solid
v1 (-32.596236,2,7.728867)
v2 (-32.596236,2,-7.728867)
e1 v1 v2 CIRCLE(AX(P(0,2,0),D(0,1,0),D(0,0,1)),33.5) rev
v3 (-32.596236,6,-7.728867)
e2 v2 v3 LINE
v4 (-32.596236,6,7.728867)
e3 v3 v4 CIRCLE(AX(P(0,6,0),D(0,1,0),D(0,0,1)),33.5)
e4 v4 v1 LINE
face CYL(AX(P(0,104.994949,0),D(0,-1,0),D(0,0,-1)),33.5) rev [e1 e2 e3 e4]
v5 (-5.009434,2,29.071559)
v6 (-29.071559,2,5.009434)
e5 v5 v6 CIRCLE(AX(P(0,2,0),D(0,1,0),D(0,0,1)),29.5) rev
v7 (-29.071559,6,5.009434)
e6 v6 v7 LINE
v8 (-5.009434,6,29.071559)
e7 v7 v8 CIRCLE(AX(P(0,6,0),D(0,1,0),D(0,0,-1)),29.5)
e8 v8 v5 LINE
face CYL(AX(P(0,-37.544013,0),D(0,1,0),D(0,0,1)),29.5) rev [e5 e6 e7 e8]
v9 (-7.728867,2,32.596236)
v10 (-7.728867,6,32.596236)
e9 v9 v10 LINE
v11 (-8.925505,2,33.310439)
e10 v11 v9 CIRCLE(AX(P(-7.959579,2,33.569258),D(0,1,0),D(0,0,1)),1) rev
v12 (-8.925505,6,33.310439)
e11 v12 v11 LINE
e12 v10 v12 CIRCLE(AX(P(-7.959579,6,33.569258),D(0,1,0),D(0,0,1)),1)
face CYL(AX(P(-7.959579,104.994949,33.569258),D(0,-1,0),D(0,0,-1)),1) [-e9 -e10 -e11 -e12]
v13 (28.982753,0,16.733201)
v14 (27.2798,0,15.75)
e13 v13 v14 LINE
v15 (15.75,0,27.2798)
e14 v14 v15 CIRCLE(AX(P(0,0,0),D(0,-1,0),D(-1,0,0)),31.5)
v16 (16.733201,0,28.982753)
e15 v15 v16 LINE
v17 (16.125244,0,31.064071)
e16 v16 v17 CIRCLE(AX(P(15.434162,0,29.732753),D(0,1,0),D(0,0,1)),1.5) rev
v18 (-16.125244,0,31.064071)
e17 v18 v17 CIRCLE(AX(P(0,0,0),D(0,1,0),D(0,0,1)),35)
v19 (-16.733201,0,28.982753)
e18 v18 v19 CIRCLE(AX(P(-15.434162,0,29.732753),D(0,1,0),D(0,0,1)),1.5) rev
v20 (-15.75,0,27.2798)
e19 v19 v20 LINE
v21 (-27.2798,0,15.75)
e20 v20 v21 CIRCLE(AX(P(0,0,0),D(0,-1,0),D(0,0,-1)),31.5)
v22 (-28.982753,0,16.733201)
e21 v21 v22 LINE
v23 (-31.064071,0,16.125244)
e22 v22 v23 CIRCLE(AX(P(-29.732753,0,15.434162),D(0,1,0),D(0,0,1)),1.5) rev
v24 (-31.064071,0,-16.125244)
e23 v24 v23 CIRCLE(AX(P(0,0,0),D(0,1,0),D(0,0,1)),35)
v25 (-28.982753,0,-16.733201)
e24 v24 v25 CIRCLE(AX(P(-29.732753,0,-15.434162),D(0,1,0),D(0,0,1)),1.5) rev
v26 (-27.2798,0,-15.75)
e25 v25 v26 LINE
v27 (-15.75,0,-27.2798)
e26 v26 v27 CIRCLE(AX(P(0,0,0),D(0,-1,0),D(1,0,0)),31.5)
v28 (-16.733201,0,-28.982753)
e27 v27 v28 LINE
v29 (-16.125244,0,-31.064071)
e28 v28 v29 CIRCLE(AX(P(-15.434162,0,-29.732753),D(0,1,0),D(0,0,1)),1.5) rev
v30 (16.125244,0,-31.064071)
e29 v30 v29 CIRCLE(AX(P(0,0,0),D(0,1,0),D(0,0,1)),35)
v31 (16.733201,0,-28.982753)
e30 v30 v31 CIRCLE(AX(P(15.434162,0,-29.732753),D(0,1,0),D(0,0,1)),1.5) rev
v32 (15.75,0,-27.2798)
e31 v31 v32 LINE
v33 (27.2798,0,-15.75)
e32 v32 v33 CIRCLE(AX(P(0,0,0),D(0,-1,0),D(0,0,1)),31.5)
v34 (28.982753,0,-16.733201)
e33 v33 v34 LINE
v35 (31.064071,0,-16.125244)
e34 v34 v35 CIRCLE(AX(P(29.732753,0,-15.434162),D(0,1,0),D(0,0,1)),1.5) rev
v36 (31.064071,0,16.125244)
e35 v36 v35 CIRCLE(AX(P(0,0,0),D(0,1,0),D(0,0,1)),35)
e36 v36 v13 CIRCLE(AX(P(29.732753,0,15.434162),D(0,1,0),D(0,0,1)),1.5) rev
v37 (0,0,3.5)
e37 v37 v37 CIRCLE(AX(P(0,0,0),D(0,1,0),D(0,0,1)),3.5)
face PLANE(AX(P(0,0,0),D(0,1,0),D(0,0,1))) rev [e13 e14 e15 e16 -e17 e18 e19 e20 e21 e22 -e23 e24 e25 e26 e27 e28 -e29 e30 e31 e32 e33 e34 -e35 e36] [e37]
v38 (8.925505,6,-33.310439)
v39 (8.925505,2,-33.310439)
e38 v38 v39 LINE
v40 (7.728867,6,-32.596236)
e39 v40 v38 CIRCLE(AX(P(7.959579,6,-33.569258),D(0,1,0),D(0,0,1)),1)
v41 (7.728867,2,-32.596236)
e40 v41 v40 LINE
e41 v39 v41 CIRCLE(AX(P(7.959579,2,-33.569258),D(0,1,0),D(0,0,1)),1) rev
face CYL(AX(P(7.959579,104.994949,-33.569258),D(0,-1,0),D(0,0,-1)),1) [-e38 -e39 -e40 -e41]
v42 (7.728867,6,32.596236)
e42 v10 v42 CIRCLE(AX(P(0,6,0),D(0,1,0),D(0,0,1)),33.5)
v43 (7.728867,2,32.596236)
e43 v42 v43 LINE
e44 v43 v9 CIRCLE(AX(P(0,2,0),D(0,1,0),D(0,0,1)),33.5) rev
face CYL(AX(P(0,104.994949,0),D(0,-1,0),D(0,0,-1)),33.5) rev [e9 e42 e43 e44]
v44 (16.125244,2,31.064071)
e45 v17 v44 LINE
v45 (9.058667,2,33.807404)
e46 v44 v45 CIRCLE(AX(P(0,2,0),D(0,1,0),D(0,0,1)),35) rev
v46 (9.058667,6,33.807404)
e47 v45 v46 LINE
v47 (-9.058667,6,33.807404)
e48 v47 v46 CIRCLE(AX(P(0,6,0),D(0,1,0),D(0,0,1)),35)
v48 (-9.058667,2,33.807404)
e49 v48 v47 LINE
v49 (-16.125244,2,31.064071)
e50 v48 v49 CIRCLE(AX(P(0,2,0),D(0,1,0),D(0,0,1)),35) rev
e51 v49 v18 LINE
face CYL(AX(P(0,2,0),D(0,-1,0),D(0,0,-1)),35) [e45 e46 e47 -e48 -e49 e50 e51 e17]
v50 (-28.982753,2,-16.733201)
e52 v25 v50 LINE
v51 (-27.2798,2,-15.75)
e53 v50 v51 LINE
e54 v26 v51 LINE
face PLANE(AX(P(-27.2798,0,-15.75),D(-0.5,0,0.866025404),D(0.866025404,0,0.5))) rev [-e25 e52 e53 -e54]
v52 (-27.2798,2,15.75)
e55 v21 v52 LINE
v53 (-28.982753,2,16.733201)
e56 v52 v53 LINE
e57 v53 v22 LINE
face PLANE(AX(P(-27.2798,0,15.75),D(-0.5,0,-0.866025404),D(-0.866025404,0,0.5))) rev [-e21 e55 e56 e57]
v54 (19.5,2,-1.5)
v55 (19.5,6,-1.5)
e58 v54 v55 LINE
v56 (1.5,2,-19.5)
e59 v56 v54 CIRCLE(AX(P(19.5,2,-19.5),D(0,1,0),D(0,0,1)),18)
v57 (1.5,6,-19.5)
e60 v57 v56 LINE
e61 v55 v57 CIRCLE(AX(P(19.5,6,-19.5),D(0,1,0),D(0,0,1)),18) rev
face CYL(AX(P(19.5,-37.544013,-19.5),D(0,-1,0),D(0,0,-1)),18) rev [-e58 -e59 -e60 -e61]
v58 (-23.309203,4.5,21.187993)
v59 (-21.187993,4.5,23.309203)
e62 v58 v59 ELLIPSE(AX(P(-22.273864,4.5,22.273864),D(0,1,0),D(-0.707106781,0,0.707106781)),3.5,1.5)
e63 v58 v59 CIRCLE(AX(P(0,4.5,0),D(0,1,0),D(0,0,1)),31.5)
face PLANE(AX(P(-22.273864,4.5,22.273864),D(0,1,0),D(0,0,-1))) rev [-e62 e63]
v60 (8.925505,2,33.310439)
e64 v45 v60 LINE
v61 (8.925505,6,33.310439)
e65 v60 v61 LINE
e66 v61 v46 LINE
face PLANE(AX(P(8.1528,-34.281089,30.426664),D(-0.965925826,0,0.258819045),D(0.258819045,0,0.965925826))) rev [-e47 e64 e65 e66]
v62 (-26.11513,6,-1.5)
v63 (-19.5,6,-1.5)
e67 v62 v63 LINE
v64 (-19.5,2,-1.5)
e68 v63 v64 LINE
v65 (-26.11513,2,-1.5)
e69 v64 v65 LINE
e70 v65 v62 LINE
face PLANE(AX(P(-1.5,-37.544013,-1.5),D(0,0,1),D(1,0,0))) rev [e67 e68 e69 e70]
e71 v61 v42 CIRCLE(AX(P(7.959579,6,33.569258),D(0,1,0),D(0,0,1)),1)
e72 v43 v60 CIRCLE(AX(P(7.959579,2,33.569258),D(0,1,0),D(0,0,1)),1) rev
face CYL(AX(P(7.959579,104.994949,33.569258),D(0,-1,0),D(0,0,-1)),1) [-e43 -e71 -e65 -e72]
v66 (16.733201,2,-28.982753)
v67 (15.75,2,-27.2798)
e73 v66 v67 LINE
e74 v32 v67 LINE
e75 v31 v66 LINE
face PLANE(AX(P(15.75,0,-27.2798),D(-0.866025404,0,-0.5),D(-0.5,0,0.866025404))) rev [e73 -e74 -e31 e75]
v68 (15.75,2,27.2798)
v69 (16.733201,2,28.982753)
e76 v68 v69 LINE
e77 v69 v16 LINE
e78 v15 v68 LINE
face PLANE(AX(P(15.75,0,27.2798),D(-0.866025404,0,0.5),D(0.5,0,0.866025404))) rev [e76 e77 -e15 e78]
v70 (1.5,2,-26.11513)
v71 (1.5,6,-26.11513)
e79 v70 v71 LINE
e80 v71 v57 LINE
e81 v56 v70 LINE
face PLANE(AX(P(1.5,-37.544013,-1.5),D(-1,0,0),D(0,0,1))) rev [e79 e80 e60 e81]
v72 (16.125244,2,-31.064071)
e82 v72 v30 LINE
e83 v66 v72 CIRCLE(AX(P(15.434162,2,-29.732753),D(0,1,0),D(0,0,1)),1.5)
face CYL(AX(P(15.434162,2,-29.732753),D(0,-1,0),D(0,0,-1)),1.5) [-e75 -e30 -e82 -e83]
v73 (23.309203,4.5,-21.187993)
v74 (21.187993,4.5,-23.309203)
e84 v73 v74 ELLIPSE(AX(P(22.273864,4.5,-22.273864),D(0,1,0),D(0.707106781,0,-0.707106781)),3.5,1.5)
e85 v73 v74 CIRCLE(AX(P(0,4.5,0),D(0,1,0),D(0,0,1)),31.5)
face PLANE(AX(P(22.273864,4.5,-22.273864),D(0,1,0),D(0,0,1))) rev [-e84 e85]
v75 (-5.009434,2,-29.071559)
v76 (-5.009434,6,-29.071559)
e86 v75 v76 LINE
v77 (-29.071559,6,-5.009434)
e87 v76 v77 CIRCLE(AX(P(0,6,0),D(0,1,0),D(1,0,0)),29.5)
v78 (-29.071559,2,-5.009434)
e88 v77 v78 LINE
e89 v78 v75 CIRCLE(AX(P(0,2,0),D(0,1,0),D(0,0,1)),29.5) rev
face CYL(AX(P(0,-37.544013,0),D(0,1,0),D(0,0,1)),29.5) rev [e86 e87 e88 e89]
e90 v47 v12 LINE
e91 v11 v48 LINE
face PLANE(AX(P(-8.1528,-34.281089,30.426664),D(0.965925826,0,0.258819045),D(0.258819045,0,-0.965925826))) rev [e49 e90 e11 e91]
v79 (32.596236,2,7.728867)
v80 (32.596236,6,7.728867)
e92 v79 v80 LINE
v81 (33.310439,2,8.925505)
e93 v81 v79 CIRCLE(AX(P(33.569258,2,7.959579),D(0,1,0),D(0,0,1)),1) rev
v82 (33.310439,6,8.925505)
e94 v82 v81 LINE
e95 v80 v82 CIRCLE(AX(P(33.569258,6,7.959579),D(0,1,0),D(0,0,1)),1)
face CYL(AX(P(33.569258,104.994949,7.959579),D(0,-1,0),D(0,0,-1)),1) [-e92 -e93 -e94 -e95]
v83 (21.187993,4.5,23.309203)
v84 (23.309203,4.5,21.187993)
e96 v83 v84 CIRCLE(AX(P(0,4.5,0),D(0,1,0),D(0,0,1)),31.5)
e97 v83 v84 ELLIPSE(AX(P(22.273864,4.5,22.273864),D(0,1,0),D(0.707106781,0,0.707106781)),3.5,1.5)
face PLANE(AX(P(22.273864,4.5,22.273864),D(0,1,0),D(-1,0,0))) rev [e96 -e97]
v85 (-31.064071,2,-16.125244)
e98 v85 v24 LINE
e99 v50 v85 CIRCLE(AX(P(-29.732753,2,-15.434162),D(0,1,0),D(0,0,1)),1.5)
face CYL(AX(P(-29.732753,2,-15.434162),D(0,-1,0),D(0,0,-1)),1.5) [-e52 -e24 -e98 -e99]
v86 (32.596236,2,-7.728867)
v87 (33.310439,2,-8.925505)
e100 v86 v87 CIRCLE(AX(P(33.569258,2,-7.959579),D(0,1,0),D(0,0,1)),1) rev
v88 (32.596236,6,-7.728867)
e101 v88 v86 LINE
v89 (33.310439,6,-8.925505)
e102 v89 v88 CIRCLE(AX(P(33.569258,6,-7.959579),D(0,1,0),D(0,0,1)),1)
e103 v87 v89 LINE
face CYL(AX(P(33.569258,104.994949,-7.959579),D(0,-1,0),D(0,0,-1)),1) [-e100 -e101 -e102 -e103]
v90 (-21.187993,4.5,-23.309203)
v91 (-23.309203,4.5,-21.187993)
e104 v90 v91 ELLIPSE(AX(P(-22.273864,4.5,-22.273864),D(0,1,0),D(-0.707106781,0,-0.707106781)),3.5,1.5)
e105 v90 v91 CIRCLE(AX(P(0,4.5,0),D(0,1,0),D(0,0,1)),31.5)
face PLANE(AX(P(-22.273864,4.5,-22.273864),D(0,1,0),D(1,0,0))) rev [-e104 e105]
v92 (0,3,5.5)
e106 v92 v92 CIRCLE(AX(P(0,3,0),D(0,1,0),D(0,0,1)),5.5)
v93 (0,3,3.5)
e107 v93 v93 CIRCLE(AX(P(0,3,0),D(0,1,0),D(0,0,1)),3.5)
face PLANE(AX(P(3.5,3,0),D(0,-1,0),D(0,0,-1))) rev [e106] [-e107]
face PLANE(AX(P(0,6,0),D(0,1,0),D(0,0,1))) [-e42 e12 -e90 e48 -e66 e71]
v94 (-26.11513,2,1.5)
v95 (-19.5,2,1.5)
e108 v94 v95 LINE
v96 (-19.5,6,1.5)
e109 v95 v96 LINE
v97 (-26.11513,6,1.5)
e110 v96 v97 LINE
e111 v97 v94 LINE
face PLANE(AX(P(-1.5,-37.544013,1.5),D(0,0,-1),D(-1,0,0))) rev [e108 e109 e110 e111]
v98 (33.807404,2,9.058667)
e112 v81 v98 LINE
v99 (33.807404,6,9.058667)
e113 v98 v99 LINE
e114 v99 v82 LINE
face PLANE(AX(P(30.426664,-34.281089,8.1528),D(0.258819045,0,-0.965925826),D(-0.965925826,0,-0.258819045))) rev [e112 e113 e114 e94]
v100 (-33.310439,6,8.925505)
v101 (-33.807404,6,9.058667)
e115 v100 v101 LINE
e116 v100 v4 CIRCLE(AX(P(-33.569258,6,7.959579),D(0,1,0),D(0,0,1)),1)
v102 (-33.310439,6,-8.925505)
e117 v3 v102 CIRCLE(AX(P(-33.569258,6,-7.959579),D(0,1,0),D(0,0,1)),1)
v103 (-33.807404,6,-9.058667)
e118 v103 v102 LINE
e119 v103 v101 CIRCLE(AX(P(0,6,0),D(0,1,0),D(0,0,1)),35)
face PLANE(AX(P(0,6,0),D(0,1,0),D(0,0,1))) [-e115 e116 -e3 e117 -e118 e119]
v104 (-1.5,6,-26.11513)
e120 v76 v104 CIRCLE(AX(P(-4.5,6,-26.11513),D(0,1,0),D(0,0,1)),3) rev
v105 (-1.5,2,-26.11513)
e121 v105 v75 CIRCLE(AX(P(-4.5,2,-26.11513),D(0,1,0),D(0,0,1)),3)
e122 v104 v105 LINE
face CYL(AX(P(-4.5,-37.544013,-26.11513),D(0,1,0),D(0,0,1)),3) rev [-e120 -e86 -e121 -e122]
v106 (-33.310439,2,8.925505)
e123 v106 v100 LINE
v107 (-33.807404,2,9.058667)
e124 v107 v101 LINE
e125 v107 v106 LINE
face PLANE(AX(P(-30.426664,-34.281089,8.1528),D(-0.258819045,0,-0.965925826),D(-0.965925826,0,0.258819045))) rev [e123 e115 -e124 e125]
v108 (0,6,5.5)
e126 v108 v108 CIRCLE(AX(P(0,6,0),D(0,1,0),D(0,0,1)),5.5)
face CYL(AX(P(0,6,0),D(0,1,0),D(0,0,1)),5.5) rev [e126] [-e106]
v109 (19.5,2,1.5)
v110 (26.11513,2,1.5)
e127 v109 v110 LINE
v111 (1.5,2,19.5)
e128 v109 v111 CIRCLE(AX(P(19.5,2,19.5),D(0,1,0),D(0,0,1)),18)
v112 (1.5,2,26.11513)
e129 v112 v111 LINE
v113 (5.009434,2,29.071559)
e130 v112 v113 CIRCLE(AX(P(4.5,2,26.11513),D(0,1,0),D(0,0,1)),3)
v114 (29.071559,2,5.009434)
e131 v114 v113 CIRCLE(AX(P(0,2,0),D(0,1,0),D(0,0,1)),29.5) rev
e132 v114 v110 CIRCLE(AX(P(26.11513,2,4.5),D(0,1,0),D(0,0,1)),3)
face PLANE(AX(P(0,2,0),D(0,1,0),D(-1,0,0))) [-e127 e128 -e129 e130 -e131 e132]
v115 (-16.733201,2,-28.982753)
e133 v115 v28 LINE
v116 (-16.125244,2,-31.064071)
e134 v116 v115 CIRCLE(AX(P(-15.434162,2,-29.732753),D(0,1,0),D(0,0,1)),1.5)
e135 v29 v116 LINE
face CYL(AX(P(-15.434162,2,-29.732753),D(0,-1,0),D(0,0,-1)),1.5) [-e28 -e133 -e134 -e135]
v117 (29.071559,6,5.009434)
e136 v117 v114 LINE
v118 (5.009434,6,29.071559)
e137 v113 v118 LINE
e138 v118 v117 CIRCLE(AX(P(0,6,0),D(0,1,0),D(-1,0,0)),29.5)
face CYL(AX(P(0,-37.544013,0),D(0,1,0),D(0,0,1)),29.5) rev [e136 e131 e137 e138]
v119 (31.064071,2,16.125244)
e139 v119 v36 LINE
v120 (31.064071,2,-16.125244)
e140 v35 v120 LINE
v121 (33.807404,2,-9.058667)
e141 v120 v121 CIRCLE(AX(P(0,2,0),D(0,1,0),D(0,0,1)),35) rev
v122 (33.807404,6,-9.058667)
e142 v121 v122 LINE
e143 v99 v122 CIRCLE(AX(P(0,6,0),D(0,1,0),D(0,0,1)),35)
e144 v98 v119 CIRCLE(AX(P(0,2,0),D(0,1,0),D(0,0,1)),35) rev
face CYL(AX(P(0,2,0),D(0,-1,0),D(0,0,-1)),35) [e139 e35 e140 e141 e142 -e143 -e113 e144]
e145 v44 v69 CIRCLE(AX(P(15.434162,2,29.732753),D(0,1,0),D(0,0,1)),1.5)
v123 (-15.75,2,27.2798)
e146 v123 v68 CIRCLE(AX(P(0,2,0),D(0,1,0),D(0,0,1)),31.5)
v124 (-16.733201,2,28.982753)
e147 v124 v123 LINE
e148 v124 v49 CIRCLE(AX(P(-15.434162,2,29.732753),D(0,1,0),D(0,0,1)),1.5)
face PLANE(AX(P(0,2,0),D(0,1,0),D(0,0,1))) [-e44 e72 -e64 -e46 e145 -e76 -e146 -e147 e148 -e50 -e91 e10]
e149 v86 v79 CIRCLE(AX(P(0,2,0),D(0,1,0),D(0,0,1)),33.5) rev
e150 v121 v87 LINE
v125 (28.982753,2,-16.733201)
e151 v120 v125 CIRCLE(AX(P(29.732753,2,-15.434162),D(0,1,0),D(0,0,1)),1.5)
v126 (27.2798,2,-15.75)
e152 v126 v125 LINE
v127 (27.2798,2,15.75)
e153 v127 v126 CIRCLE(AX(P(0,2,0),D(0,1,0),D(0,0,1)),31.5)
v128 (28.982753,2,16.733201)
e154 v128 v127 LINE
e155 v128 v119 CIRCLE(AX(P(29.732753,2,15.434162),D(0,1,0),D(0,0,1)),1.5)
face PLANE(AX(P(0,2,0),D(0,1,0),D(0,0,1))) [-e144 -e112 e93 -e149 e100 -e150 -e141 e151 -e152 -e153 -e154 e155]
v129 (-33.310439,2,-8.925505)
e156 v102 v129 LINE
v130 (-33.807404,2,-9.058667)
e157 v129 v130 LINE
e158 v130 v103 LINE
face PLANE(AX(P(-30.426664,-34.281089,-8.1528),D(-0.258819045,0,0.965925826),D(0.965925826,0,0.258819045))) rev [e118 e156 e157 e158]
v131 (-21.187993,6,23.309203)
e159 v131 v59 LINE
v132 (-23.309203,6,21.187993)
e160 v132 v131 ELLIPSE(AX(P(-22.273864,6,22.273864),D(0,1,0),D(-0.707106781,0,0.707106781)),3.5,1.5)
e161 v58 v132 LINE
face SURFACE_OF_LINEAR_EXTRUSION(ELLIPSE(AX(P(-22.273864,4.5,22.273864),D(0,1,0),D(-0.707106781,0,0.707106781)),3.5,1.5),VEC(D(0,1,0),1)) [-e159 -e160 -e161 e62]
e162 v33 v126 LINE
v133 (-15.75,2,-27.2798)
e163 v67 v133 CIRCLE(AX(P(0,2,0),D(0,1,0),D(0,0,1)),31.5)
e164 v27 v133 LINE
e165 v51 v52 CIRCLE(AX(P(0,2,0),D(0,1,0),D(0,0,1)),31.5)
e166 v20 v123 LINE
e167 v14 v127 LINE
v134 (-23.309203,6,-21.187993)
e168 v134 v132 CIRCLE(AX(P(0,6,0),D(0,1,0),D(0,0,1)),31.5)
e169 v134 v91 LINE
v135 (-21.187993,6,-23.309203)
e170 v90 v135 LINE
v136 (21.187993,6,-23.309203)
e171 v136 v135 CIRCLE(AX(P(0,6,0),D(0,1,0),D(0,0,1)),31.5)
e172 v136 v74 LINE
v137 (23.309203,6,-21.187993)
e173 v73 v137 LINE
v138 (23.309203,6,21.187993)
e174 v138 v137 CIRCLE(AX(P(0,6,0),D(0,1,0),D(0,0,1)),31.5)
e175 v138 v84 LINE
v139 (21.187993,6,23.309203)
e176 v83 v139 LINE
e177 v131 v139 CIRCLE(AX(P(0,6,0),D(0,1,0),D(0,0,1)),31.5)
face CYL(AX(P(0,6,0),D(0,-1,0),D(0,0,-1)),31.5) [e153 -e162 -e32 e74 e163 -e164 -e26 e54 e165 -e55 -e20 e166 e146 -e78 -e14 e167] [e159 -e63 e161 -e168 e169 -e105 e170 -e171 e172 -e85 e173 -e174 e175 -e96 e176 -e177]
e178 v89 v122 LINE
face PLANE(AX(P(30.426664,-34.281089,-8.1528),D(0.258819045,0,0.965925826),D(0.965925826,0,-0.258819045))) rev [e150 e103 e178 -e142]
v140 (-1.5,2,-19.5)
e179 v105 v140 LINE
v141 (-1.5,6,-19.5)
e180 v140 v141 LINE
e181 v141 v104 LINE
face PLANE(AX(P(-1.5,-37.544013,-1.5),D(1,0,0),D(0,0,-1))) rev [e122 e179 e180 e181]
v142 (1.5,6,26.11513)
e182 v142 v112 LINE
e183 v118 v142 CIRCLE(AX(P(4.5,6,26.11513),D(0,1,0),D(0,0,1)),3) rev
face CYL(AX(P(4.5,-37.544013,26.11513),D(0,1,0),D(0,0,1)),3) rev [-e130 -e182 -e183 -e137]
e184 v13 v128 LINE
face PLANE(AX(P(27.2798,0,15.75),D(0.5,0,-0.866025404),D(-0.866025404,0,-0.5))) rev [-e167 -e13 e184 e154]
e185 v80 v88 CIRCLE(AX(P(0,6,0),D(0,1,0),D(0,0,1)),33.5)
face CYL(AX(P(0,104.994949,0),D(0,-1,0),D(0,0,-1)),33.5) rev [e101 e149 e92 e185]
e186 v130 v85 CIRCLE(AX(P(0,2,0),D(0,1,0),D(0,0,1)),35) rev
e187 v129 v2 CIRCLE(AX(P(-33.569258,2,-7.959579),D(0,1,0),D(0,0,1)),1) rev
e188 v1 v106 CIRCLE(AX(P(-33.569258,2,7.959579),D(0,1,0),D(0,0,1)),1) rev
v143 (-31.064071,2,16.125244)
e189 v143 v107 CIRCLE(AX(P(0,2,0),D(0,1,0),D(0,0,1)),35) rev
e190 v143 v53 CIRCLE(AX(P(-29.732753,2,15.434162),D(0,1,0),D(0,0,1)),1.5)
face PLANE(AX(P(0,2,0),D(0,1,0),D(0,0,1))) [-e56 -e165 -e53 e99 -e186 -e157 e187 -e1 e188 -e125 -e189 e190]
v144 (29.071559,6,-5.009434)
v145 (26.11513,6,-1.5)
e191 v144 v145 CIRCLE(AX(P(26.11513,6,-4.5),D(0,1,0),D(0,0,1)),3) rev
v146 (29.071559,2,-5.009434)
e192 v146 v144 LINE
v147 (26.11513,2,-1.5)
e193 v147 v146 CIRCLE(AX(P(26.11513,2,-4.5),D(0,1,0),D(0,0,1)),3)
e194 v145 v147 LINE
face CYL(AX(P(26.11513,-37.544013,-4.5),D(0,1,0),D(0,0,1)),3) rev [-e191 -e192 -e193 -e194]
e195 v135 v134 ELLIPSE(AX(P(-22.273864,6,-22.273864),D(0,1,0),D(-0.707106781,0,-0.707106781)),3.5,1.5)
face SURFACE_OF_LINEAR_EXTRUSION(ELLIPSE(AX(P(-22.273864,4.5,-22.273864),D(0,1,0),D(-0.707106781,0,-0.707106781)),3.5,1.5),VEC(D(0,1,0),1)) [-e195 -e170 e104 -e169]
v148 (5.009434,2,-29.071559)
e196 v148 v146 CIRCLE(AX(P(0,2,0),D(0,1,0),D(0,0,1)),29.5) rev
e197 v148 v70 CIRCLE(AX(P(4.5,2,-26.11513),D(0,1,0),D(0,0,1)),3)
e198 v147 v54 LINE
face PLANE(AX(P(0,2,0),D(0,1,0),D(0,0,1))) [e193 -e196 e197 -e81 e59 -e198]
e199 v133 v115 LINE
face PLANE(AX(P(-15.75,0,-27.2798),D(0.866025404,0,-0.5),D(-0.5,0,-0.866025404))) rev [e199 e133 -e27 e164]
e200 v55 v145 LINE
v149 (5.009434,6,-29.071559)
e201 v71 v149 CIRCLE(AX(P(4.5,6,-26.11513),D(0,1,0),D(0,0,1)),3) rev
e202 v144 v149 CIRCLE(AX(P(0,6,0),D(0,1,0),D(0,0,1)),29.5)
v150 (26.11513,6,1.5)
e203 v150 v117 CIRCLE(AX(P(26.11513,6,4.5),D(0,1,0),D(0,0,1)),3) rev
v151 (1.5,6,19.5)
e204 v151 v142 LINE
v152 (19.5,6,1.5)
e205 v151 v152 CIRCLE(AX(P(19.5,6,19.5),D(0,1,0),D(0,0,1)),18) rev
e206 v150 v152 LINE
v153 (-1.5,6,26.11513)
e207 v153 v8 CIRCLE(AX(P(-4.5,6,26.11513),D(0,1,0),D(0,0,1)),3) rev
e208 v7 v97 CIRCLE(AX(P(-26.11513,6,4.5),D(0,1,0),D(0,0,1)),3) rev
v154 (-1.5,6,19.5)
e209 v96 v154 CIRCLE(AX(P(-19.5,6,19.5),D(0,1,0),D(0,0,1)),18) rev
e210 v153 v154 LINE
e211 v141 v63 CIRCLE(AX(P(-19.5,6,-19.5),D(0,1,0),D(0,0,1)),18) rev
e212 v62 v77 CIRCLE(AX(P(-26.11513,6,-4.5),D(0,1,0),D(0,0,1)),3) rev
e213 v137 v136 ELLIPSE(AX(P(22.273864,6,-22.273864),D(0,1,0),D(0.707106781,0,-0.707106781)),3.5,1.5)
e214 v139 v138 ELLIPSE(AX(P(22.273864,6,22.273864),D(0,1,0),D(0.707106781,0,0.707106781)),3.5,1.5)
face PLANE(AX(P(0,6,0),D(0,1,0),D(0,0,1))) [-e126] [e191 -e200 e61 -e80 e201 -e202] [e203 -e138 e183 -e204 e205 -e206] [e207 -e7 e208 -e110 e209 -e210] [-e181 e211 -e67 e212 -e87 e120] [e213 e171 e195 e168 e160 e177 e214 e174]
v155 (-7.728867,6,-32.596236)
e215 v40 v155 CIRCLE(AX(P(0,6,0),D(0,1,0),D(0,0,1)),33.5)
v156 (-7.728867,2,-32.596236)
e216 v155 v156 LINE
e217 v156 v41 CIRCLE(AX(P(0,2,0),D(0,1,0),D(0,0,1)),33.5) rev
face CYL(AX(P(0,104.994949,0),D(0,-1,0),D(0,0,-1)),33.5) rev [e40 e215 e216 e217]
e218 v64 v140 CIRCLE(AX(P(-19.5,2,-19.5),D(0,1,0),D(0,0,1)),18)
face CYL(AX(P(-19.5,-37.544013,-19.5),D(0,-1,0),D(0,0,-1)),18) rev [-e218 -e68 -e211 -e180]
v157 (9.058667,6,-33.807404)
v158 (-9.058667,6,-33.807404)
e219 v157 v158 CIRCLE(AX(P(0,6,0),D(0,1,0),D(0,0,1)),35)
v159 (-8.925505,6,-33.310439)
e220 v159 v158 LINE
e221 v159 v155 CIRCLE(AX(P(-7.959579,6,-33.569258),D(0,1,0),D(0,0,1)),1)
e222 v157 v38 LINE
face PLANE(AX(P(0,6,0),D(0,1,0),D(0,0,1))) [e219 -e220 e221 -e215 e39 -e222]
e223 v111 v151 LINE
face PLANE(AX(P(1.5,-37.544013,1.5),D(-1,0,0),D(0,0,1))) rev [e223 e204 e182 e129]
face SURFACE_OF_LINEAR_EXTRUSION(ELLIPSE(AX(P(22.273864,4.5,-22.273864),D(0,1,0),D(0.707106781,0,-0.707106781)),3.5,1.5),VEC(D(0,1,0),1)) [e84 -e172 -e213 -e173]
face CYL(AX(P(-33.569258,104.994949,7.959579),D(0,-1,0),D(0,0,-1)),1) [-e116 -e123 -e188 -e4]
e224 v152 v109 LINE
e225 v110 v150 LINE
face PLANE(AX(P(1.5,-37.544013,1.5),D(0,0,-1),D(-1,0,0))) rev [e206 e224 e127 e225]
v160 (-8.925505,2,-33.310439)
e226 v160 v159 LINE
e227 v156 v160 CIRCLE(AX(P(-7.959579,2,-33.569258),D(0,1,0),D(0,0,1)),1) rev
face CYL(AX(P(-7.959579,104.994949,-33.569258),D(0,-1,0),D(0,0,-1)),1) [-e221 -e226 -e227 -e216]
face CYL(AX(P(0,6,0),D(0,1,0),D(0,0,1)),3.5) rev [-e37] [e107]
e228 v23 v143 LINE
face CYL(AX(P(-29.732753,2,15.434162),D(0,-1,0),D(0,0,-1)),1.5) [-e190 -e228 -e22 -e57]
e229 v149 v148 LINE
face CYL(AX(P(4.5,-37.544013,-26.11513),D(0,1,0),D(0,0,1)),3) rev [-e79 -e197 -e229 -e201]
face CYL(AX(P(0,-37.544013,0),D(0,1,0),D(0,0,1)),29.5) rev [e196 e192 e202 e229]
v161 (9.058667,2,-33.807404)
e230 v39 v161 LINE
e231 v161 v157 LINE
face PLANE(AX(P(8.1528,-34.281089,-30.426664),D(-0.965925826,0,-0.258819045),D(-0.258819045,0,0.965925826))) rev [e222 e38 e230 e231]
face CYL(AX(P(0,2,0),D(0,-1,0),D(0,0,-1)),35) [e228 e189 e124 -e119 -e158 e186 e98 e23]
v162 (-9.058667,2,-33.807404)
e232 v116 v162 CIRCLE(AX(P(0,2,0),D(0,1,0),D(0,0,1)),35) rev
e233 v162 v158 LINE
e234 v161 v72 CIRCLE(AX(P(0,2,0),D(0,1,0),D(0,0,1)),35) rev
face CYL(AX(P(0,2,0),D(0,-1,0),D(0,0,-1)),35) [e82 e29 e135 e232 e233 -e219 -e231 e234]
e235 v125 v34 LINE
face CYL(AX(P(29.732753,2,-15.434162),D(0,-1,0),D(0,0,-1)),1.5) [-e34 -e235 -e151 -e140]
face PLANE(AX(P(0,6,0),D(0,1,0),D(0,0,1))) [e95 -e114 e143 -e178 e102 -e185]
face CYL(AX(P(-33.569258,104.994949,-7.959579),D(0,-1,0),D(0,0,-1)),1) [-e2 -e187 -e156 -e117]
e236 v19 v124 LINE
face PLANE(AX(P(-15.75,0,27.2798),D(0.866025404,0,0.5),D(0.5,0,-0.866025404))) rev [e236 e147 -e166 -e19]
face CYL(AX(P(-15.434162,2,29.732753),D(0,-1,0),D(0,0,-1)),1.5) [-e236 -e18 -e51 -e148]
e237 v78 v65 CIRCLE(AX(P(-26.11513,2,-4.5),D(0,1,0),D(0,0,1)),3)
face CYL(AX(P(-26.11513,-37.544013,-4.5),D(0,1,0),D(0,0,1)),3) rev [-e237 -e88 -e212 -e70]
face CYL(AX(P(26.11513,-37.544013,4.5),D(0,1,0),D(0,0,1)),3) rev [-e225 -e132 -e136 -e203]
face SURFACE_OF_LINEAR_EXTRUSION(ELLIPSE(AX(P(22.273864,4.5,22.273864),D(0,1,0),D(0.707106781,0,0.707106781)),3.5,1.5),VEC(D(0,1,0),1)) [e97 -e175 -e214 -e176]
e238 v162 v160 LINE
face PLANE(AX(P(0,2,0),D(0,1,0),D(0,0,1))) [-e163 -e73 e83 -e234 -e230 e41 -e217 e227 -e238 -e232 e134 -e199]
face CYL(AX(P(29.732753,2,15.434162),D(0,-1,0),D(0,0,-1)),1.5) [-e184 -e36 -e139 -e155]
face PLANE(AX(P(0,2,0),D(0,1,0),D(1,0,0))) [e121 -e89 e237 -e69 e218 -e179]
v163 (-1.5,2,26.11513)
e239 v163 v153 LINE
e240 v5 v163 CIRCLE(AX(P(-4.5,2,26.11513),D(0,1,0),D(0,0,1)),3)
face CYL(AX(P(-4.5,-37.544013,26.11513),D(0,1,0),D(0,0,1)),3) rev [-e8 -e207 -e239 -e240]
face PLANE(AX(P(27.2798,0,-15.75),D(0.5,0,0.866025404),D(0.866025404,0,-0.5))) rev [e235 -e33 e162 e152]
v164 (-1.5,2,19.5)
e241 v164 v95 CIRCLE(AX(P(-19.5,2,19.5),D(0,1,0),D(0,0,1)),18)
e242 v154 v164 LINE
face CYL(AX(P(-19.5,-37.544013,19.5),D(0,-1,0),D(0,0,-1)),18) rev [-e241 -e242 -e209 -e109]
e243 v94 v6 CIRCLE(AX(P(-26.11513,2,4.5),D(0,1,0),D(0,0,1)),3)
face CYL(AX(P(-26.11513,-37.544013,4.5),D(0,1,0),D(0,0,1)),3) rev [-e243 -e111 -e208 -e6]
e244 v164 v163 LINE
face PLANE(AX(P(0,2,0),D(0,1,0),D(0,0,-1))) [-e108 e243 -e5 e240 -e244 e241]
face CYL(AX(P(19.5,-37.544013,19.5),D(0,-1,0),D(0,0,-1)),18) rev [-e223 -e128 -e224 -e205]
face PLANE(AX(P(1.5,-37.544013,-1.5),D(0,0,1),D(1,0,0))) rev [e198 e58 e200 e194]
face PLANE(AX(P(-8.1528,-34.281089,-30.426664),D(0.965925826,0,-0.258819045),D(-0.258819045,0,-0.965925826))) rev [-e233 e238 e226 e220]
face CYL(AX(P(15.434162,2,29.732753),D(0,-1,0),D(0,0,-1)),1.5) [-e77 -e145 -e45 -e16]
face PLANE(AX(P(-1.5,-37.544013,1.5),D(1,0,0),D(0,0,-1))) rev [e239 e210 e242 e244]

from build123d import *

# Parameters (mm, degrees)
SKETCH1_R                                           = 35
BOSS_EXTRUDE1_DEPTH                                 = 2
SKETCH2_R                                           = 31.5
BOSS_EXTRUDE2_DEPTH                                 = 4
SKETCH4_R                                           = 35
SKETCH4_R_2                                         = 33.5
BOSS_EXTRUDE3_DEPTH                                 = 4
CUT_EXTRUDE2_START                                  = -6
CUT_EXTRUDE2_DEPTH                                  = 6
CUT_EXTRUDE3_START                                  = -4
CUT_EXTRUDE3_DEPTH                                  = 4
SKETCH7_RX                                          = 3.5
SKETCH7_RY                                          = 1.5
BOSS_EXTRUDE4_DEPTH                                 = 1.5
CUT_EXTRUDE1_DEPTH                                  = 4
FILLET1_R                                           = 18
FILLET2_R                                           = 3
FILLET3_R                                           = 1.5
FILLET4_R                                           = 1
CIRPATTERN1_COUNT                                   = 4
FILLET1_OF_CIRPATTERN1_R                            = 18
FILLET2_OF_CIRPATTERN1_R                            = 3
FILLET3_OF_CIRPATTERN1_R                            = 1.5
FILLET4_OF_CIRPATTERN1_R                            = 1
CBORE_FOR_M6_HEX_SOCKET_HEAD_CAP_SCREW1_D           = 7
CBORE_FOR_M6_HEX_SOCKET_HEAD_CAP_SCREW1_CBORE_D     = 11
CBORE_FOR_M6_HEX_SOCKET_HEAD_CAP_SCREW1_CBORE_DEPTH = 3


# Read off the part's stored shape, not the designer's step: Cut-Extrude2
with BuildPart() as part:
    # Sketch1 → Boss-Extrude1 (new body)
    with BuildSketch(Plane(origin=(0, 0, 0), x_dir=(1, 0, 0), z_dir=(0, 1, 0))):
        with Locations(Location((0, 0, 0), (0, 0, 270))):
            Circle(SKETCH1_R)
    extrude(amount=BOSS_EXTRUDE1_DEPTH)

    # Sketch2 → Boss-Extrude2 (add)
    with BuildSketch(Plane(origin=(0, 2, 0), x_dir=(1, 0, 0), z_dir=(0, 1, 0))):
        with Locations(Location((0, 0, 0), (0, 0, 270))):
            Circle(SKETCH2_R)
    extrude(amount=BOSS_EXTRUDE2_DEPTH)

    # Sketch4 → Boss-Extrude3 (add)
    with BuildSketch(Plane(origin=(0, 2, 0), x_dir=(1, 0, 0), z_dir=(0, 1, 0))):
        with Locations(Location((0, 0, 0), (0, 0, 270))):
            Circle(SKETCH4_R)
        with Locations(Location((0, 0, 0), (0, 0, 270))):
            Circle(SKETCH4_R_2, mode=Mode.SUBTRACT)
    extrude(amount=BOSS_EXTRUDE3_DEPTH)

    # Cut-Extrude2 outline → Cut-Extrude2 (cut)
    with BuildSketch(Plane(origin=(0, 6, 0), x_dir=(1, 0, 0), z_dir=(0, 1, 0)).offset(CUT_EXTRUDE2_START)):
        with BuildLine():
            ThreePointArc((30.310889132, 17.5), (24.748737342, 24.748737342), (17.5, 30.310889132))
            Line((17.5, 30.310889132), (15.75, 27.279800219))
            ThreePointArc((15.75, 27.279800219), (22.273863607, 22.273863607), (27.279800219, 15.75))
            Line((27.279800219, 15.75), (30.310889132, 17.5))
        make_face()
    cut_extrude2 = extrude(amount=CUT_EXTRUDE2_DEPTH, mode=Mode.SUBTRACT)

    # Sketch6 → Cut-Extrude3 (cut)
    with BuildSketch(Plane(origin=(0, 6, 0), x_dir=(1, 0, 0), z_dir=(0, 1, 0)).offset(CUT_EXTRUDE3_START)):
        with BuildLine():
            Line((8.152799921, 30.426663528), (9.058666579, 33.80740392))
            ThreePointArc((9.058666579, 33.80740392), (24.748737342, 24.748737342), (33.80740392, 9.058666579))
            Line((33.80740392, 9.058666579), (30.426663528, 8.152799921))
            ThreePointArc((30.426663528, 8.152799921), (22.273863607, 22.273863607), (8.152799921, 30.426663528))
        make_face()
    cut_extrude3 = extrude(amount=CUT_EXTRUDE3_DEPTH, mode=Mode.SUBTRACT)

    # Sketch7 → Boss-Extrude4 (add)
    with BuildSketch(Plane(origin=(0, 6, 0), x_dir=(1, 0, 0), z_dir=(0, 1, 0))):
        with Locations(Location((22.273863607, 22.273863607), (0, 0, 45))):
            Ellipse(SKETCH7_RX, SKETCH7_RY)
    boss_extrude4 = extrude(amount=-BOSS_EXTRUDE4_DEPTH)

    # Sketch3 → Cut-Extrude1 (cut)
    with BuildSketch(Plane(origin=(0, 6, 0), x_dir=(1, 0, 0), z_dir=(0, 1, 0))):
        with BuildLine():
            Line((1.5, 1.5), (1.5, 29.461839725))
            ThreePointArc((1.5, 29.461839725), (20.859650045, 20.859650045), (29.461839725, 1.5))
            Line((29.461839725, 1.5), (1.5, 1.5))
        make_face()
    cut_extrude1 = extrude(amount=-CUT_EXTRUDE1_DEPTH, mode=Mode.SUBTRACT)

    # Fillet1
    fillet1_edges = [part.edges().sort_by_distance(p)[0] for p in [
        (1.5, 4, -1.5),
    ]]
    fillet(fillet1_edges, radius=FILLET1_R)

    # Fillet2
    fillet2_edges = [part.edges().sort_by_distance(p)[0] for p in [
        (29.461839725, 4, -1.5),
        (1.5, 4, -29.461839725),
    ]]
    fillet(fillet2_edges, radius=FILLET2_R)

    # Fillet3
    fillet3_edges = [part.edges().sort_by_distance(p)[0] for p in [
        (17.5, 1, -30.310889132),
        (30.310889132, 1, -17.5),
    ]]
    fillet(fillet3_edges, radius=FILLET3_R)

    # Fillet4
    fillet4_edges = [part.edges().sort_by_distance(p)[0] for p in [
        (8.670438011, 4, -32.358515181),
        (32.358515181, 4, -8.670438011),
    ]]
    fillet(fillet4_edges, radius=FILLET4_R)

    # CirPattern1: Cut-Extrude2, Cut-Extrude3, Boss-Extrude4, Cut-Extrude1 ×4 about axis
    cirpattern1_axis = Axis((0, 6, 0), (0, -1, 0))
    add([cut_extrude2.rotate(cirpattern1_axis, i * 360 / CIRPATTERN1_COUNT) for i in range(1, CIRPATTERN1_COUNT)], mode=Mode.SUBTRACT)
    add([cut_extrude3.rotate(cirpattern1_axis, i * 360 / CIRPATTERN1_COUNT) for i in range(1, CIRPATTERN1_COUNT)], mode=Mode.SUBTRACT)
    add([boss_extrude4.rotate(cirpattern1_axis, i * 360 / CIRPATTERN1_COUNT) for i in range(1, CIRPATTERN1_COUNT)])
    add([cut_extrude1.rotate(cirpattern1_axis, i * 360 / CIRPATTERN1_COUNT) for i in range(1, CIRPATTERN1_COUNT)], mode=Mode.SUBTRACT)

    # Fillet1 of CirPattern1
    fillet1_of_cirpattern1_edges = [part.edges().sort_by_distance(p)[0] for p in [
        (1.5, 4, 1.5),
        (-1.5, 4, 1.5),
        (-1.5, 4, -1.5),
    ]]
    fillet(fillet1_of_cirpattern1_edges, radius=FILLET1_OF_CIRPATTERN1_R)

    # Fillet2 of CirPattern1
    fillet2_of_cirpattern1_edges = [part.edges().sort_by_distance(p)[0] for p in [
        (1.5, 4, 29.461839725),
        (29.461839725, 4, 1.5),
        (-29.461839725, 4, 1.5),
        (-1.5, 4, 29.461839725),
        (-1.5, 4, -29.461839725),
        (-29.461839725, 4, -1.5),
    ]]
    fillet(fillet2_of_cirpattern1_edges, radius=FILLET2_OF_CIRPATTERN1_R)

    # Fillet3 of CirPattern1
    fillet3_of_cirpattern1_edges = [part.edges().sort_by_distance(p)[0] for p in [
        (30.310889132, 1, 17.5),
        (17.5, 1, 30.310889132),
        (-17.5, 1, 30.310889132),
        (-30.310889132, 1, 17.5),
        (-30.310889132, 1, -17.5),
        (-17.5, 1, -30.310889132),
    ]]
    fillet(fillet3_of_cirpattern1_edges, radius=FILLET3_OF_CIRPATTERN1_R)

    # Fillet4 of CirPattern1
    fillet4_of_cirpattern1_edges = [part.edges().sort_by_distance(p)[0] for p in [
        (32.358515181, 4, 8.670438011),
        (8.670438011, 4, 32.358515181),
        (-8.670438011, 4, 32.358515181),
        (-32.358515181, 4, 8.670438011),
        (-32.358515181, 4, -8.670438011),
        (-8.670438011, 4, -32.358515181),
    ]]
    fillet(fillet4_of_cirpattern1_edges, radius=FILLET4_OF_CIRPATTERN1_R)

    # CBORE for M6 Hex Socket Head Cap Screw1 (through all)
    with Locations(Plane(origin=(0, 6, 0), x_dir=(1, 0, 0), z_dir=(0, 1, 0))):
        with Locations((0, 0)):
            CounterBoreHole(CBORE_FOR_M6_HEX_SOCKET_HEAD_CAP_SCREW1_D / 2, CBORE_FOR_M6_HEX_SOCKET_HEAD_CAP_SCREW1_CBORE_D / 2, CBORE_FOR_M6_HEX_SOCKET_HEAD_CAP_SCREW1_CBORE_DEPTH)


solid = part.part
